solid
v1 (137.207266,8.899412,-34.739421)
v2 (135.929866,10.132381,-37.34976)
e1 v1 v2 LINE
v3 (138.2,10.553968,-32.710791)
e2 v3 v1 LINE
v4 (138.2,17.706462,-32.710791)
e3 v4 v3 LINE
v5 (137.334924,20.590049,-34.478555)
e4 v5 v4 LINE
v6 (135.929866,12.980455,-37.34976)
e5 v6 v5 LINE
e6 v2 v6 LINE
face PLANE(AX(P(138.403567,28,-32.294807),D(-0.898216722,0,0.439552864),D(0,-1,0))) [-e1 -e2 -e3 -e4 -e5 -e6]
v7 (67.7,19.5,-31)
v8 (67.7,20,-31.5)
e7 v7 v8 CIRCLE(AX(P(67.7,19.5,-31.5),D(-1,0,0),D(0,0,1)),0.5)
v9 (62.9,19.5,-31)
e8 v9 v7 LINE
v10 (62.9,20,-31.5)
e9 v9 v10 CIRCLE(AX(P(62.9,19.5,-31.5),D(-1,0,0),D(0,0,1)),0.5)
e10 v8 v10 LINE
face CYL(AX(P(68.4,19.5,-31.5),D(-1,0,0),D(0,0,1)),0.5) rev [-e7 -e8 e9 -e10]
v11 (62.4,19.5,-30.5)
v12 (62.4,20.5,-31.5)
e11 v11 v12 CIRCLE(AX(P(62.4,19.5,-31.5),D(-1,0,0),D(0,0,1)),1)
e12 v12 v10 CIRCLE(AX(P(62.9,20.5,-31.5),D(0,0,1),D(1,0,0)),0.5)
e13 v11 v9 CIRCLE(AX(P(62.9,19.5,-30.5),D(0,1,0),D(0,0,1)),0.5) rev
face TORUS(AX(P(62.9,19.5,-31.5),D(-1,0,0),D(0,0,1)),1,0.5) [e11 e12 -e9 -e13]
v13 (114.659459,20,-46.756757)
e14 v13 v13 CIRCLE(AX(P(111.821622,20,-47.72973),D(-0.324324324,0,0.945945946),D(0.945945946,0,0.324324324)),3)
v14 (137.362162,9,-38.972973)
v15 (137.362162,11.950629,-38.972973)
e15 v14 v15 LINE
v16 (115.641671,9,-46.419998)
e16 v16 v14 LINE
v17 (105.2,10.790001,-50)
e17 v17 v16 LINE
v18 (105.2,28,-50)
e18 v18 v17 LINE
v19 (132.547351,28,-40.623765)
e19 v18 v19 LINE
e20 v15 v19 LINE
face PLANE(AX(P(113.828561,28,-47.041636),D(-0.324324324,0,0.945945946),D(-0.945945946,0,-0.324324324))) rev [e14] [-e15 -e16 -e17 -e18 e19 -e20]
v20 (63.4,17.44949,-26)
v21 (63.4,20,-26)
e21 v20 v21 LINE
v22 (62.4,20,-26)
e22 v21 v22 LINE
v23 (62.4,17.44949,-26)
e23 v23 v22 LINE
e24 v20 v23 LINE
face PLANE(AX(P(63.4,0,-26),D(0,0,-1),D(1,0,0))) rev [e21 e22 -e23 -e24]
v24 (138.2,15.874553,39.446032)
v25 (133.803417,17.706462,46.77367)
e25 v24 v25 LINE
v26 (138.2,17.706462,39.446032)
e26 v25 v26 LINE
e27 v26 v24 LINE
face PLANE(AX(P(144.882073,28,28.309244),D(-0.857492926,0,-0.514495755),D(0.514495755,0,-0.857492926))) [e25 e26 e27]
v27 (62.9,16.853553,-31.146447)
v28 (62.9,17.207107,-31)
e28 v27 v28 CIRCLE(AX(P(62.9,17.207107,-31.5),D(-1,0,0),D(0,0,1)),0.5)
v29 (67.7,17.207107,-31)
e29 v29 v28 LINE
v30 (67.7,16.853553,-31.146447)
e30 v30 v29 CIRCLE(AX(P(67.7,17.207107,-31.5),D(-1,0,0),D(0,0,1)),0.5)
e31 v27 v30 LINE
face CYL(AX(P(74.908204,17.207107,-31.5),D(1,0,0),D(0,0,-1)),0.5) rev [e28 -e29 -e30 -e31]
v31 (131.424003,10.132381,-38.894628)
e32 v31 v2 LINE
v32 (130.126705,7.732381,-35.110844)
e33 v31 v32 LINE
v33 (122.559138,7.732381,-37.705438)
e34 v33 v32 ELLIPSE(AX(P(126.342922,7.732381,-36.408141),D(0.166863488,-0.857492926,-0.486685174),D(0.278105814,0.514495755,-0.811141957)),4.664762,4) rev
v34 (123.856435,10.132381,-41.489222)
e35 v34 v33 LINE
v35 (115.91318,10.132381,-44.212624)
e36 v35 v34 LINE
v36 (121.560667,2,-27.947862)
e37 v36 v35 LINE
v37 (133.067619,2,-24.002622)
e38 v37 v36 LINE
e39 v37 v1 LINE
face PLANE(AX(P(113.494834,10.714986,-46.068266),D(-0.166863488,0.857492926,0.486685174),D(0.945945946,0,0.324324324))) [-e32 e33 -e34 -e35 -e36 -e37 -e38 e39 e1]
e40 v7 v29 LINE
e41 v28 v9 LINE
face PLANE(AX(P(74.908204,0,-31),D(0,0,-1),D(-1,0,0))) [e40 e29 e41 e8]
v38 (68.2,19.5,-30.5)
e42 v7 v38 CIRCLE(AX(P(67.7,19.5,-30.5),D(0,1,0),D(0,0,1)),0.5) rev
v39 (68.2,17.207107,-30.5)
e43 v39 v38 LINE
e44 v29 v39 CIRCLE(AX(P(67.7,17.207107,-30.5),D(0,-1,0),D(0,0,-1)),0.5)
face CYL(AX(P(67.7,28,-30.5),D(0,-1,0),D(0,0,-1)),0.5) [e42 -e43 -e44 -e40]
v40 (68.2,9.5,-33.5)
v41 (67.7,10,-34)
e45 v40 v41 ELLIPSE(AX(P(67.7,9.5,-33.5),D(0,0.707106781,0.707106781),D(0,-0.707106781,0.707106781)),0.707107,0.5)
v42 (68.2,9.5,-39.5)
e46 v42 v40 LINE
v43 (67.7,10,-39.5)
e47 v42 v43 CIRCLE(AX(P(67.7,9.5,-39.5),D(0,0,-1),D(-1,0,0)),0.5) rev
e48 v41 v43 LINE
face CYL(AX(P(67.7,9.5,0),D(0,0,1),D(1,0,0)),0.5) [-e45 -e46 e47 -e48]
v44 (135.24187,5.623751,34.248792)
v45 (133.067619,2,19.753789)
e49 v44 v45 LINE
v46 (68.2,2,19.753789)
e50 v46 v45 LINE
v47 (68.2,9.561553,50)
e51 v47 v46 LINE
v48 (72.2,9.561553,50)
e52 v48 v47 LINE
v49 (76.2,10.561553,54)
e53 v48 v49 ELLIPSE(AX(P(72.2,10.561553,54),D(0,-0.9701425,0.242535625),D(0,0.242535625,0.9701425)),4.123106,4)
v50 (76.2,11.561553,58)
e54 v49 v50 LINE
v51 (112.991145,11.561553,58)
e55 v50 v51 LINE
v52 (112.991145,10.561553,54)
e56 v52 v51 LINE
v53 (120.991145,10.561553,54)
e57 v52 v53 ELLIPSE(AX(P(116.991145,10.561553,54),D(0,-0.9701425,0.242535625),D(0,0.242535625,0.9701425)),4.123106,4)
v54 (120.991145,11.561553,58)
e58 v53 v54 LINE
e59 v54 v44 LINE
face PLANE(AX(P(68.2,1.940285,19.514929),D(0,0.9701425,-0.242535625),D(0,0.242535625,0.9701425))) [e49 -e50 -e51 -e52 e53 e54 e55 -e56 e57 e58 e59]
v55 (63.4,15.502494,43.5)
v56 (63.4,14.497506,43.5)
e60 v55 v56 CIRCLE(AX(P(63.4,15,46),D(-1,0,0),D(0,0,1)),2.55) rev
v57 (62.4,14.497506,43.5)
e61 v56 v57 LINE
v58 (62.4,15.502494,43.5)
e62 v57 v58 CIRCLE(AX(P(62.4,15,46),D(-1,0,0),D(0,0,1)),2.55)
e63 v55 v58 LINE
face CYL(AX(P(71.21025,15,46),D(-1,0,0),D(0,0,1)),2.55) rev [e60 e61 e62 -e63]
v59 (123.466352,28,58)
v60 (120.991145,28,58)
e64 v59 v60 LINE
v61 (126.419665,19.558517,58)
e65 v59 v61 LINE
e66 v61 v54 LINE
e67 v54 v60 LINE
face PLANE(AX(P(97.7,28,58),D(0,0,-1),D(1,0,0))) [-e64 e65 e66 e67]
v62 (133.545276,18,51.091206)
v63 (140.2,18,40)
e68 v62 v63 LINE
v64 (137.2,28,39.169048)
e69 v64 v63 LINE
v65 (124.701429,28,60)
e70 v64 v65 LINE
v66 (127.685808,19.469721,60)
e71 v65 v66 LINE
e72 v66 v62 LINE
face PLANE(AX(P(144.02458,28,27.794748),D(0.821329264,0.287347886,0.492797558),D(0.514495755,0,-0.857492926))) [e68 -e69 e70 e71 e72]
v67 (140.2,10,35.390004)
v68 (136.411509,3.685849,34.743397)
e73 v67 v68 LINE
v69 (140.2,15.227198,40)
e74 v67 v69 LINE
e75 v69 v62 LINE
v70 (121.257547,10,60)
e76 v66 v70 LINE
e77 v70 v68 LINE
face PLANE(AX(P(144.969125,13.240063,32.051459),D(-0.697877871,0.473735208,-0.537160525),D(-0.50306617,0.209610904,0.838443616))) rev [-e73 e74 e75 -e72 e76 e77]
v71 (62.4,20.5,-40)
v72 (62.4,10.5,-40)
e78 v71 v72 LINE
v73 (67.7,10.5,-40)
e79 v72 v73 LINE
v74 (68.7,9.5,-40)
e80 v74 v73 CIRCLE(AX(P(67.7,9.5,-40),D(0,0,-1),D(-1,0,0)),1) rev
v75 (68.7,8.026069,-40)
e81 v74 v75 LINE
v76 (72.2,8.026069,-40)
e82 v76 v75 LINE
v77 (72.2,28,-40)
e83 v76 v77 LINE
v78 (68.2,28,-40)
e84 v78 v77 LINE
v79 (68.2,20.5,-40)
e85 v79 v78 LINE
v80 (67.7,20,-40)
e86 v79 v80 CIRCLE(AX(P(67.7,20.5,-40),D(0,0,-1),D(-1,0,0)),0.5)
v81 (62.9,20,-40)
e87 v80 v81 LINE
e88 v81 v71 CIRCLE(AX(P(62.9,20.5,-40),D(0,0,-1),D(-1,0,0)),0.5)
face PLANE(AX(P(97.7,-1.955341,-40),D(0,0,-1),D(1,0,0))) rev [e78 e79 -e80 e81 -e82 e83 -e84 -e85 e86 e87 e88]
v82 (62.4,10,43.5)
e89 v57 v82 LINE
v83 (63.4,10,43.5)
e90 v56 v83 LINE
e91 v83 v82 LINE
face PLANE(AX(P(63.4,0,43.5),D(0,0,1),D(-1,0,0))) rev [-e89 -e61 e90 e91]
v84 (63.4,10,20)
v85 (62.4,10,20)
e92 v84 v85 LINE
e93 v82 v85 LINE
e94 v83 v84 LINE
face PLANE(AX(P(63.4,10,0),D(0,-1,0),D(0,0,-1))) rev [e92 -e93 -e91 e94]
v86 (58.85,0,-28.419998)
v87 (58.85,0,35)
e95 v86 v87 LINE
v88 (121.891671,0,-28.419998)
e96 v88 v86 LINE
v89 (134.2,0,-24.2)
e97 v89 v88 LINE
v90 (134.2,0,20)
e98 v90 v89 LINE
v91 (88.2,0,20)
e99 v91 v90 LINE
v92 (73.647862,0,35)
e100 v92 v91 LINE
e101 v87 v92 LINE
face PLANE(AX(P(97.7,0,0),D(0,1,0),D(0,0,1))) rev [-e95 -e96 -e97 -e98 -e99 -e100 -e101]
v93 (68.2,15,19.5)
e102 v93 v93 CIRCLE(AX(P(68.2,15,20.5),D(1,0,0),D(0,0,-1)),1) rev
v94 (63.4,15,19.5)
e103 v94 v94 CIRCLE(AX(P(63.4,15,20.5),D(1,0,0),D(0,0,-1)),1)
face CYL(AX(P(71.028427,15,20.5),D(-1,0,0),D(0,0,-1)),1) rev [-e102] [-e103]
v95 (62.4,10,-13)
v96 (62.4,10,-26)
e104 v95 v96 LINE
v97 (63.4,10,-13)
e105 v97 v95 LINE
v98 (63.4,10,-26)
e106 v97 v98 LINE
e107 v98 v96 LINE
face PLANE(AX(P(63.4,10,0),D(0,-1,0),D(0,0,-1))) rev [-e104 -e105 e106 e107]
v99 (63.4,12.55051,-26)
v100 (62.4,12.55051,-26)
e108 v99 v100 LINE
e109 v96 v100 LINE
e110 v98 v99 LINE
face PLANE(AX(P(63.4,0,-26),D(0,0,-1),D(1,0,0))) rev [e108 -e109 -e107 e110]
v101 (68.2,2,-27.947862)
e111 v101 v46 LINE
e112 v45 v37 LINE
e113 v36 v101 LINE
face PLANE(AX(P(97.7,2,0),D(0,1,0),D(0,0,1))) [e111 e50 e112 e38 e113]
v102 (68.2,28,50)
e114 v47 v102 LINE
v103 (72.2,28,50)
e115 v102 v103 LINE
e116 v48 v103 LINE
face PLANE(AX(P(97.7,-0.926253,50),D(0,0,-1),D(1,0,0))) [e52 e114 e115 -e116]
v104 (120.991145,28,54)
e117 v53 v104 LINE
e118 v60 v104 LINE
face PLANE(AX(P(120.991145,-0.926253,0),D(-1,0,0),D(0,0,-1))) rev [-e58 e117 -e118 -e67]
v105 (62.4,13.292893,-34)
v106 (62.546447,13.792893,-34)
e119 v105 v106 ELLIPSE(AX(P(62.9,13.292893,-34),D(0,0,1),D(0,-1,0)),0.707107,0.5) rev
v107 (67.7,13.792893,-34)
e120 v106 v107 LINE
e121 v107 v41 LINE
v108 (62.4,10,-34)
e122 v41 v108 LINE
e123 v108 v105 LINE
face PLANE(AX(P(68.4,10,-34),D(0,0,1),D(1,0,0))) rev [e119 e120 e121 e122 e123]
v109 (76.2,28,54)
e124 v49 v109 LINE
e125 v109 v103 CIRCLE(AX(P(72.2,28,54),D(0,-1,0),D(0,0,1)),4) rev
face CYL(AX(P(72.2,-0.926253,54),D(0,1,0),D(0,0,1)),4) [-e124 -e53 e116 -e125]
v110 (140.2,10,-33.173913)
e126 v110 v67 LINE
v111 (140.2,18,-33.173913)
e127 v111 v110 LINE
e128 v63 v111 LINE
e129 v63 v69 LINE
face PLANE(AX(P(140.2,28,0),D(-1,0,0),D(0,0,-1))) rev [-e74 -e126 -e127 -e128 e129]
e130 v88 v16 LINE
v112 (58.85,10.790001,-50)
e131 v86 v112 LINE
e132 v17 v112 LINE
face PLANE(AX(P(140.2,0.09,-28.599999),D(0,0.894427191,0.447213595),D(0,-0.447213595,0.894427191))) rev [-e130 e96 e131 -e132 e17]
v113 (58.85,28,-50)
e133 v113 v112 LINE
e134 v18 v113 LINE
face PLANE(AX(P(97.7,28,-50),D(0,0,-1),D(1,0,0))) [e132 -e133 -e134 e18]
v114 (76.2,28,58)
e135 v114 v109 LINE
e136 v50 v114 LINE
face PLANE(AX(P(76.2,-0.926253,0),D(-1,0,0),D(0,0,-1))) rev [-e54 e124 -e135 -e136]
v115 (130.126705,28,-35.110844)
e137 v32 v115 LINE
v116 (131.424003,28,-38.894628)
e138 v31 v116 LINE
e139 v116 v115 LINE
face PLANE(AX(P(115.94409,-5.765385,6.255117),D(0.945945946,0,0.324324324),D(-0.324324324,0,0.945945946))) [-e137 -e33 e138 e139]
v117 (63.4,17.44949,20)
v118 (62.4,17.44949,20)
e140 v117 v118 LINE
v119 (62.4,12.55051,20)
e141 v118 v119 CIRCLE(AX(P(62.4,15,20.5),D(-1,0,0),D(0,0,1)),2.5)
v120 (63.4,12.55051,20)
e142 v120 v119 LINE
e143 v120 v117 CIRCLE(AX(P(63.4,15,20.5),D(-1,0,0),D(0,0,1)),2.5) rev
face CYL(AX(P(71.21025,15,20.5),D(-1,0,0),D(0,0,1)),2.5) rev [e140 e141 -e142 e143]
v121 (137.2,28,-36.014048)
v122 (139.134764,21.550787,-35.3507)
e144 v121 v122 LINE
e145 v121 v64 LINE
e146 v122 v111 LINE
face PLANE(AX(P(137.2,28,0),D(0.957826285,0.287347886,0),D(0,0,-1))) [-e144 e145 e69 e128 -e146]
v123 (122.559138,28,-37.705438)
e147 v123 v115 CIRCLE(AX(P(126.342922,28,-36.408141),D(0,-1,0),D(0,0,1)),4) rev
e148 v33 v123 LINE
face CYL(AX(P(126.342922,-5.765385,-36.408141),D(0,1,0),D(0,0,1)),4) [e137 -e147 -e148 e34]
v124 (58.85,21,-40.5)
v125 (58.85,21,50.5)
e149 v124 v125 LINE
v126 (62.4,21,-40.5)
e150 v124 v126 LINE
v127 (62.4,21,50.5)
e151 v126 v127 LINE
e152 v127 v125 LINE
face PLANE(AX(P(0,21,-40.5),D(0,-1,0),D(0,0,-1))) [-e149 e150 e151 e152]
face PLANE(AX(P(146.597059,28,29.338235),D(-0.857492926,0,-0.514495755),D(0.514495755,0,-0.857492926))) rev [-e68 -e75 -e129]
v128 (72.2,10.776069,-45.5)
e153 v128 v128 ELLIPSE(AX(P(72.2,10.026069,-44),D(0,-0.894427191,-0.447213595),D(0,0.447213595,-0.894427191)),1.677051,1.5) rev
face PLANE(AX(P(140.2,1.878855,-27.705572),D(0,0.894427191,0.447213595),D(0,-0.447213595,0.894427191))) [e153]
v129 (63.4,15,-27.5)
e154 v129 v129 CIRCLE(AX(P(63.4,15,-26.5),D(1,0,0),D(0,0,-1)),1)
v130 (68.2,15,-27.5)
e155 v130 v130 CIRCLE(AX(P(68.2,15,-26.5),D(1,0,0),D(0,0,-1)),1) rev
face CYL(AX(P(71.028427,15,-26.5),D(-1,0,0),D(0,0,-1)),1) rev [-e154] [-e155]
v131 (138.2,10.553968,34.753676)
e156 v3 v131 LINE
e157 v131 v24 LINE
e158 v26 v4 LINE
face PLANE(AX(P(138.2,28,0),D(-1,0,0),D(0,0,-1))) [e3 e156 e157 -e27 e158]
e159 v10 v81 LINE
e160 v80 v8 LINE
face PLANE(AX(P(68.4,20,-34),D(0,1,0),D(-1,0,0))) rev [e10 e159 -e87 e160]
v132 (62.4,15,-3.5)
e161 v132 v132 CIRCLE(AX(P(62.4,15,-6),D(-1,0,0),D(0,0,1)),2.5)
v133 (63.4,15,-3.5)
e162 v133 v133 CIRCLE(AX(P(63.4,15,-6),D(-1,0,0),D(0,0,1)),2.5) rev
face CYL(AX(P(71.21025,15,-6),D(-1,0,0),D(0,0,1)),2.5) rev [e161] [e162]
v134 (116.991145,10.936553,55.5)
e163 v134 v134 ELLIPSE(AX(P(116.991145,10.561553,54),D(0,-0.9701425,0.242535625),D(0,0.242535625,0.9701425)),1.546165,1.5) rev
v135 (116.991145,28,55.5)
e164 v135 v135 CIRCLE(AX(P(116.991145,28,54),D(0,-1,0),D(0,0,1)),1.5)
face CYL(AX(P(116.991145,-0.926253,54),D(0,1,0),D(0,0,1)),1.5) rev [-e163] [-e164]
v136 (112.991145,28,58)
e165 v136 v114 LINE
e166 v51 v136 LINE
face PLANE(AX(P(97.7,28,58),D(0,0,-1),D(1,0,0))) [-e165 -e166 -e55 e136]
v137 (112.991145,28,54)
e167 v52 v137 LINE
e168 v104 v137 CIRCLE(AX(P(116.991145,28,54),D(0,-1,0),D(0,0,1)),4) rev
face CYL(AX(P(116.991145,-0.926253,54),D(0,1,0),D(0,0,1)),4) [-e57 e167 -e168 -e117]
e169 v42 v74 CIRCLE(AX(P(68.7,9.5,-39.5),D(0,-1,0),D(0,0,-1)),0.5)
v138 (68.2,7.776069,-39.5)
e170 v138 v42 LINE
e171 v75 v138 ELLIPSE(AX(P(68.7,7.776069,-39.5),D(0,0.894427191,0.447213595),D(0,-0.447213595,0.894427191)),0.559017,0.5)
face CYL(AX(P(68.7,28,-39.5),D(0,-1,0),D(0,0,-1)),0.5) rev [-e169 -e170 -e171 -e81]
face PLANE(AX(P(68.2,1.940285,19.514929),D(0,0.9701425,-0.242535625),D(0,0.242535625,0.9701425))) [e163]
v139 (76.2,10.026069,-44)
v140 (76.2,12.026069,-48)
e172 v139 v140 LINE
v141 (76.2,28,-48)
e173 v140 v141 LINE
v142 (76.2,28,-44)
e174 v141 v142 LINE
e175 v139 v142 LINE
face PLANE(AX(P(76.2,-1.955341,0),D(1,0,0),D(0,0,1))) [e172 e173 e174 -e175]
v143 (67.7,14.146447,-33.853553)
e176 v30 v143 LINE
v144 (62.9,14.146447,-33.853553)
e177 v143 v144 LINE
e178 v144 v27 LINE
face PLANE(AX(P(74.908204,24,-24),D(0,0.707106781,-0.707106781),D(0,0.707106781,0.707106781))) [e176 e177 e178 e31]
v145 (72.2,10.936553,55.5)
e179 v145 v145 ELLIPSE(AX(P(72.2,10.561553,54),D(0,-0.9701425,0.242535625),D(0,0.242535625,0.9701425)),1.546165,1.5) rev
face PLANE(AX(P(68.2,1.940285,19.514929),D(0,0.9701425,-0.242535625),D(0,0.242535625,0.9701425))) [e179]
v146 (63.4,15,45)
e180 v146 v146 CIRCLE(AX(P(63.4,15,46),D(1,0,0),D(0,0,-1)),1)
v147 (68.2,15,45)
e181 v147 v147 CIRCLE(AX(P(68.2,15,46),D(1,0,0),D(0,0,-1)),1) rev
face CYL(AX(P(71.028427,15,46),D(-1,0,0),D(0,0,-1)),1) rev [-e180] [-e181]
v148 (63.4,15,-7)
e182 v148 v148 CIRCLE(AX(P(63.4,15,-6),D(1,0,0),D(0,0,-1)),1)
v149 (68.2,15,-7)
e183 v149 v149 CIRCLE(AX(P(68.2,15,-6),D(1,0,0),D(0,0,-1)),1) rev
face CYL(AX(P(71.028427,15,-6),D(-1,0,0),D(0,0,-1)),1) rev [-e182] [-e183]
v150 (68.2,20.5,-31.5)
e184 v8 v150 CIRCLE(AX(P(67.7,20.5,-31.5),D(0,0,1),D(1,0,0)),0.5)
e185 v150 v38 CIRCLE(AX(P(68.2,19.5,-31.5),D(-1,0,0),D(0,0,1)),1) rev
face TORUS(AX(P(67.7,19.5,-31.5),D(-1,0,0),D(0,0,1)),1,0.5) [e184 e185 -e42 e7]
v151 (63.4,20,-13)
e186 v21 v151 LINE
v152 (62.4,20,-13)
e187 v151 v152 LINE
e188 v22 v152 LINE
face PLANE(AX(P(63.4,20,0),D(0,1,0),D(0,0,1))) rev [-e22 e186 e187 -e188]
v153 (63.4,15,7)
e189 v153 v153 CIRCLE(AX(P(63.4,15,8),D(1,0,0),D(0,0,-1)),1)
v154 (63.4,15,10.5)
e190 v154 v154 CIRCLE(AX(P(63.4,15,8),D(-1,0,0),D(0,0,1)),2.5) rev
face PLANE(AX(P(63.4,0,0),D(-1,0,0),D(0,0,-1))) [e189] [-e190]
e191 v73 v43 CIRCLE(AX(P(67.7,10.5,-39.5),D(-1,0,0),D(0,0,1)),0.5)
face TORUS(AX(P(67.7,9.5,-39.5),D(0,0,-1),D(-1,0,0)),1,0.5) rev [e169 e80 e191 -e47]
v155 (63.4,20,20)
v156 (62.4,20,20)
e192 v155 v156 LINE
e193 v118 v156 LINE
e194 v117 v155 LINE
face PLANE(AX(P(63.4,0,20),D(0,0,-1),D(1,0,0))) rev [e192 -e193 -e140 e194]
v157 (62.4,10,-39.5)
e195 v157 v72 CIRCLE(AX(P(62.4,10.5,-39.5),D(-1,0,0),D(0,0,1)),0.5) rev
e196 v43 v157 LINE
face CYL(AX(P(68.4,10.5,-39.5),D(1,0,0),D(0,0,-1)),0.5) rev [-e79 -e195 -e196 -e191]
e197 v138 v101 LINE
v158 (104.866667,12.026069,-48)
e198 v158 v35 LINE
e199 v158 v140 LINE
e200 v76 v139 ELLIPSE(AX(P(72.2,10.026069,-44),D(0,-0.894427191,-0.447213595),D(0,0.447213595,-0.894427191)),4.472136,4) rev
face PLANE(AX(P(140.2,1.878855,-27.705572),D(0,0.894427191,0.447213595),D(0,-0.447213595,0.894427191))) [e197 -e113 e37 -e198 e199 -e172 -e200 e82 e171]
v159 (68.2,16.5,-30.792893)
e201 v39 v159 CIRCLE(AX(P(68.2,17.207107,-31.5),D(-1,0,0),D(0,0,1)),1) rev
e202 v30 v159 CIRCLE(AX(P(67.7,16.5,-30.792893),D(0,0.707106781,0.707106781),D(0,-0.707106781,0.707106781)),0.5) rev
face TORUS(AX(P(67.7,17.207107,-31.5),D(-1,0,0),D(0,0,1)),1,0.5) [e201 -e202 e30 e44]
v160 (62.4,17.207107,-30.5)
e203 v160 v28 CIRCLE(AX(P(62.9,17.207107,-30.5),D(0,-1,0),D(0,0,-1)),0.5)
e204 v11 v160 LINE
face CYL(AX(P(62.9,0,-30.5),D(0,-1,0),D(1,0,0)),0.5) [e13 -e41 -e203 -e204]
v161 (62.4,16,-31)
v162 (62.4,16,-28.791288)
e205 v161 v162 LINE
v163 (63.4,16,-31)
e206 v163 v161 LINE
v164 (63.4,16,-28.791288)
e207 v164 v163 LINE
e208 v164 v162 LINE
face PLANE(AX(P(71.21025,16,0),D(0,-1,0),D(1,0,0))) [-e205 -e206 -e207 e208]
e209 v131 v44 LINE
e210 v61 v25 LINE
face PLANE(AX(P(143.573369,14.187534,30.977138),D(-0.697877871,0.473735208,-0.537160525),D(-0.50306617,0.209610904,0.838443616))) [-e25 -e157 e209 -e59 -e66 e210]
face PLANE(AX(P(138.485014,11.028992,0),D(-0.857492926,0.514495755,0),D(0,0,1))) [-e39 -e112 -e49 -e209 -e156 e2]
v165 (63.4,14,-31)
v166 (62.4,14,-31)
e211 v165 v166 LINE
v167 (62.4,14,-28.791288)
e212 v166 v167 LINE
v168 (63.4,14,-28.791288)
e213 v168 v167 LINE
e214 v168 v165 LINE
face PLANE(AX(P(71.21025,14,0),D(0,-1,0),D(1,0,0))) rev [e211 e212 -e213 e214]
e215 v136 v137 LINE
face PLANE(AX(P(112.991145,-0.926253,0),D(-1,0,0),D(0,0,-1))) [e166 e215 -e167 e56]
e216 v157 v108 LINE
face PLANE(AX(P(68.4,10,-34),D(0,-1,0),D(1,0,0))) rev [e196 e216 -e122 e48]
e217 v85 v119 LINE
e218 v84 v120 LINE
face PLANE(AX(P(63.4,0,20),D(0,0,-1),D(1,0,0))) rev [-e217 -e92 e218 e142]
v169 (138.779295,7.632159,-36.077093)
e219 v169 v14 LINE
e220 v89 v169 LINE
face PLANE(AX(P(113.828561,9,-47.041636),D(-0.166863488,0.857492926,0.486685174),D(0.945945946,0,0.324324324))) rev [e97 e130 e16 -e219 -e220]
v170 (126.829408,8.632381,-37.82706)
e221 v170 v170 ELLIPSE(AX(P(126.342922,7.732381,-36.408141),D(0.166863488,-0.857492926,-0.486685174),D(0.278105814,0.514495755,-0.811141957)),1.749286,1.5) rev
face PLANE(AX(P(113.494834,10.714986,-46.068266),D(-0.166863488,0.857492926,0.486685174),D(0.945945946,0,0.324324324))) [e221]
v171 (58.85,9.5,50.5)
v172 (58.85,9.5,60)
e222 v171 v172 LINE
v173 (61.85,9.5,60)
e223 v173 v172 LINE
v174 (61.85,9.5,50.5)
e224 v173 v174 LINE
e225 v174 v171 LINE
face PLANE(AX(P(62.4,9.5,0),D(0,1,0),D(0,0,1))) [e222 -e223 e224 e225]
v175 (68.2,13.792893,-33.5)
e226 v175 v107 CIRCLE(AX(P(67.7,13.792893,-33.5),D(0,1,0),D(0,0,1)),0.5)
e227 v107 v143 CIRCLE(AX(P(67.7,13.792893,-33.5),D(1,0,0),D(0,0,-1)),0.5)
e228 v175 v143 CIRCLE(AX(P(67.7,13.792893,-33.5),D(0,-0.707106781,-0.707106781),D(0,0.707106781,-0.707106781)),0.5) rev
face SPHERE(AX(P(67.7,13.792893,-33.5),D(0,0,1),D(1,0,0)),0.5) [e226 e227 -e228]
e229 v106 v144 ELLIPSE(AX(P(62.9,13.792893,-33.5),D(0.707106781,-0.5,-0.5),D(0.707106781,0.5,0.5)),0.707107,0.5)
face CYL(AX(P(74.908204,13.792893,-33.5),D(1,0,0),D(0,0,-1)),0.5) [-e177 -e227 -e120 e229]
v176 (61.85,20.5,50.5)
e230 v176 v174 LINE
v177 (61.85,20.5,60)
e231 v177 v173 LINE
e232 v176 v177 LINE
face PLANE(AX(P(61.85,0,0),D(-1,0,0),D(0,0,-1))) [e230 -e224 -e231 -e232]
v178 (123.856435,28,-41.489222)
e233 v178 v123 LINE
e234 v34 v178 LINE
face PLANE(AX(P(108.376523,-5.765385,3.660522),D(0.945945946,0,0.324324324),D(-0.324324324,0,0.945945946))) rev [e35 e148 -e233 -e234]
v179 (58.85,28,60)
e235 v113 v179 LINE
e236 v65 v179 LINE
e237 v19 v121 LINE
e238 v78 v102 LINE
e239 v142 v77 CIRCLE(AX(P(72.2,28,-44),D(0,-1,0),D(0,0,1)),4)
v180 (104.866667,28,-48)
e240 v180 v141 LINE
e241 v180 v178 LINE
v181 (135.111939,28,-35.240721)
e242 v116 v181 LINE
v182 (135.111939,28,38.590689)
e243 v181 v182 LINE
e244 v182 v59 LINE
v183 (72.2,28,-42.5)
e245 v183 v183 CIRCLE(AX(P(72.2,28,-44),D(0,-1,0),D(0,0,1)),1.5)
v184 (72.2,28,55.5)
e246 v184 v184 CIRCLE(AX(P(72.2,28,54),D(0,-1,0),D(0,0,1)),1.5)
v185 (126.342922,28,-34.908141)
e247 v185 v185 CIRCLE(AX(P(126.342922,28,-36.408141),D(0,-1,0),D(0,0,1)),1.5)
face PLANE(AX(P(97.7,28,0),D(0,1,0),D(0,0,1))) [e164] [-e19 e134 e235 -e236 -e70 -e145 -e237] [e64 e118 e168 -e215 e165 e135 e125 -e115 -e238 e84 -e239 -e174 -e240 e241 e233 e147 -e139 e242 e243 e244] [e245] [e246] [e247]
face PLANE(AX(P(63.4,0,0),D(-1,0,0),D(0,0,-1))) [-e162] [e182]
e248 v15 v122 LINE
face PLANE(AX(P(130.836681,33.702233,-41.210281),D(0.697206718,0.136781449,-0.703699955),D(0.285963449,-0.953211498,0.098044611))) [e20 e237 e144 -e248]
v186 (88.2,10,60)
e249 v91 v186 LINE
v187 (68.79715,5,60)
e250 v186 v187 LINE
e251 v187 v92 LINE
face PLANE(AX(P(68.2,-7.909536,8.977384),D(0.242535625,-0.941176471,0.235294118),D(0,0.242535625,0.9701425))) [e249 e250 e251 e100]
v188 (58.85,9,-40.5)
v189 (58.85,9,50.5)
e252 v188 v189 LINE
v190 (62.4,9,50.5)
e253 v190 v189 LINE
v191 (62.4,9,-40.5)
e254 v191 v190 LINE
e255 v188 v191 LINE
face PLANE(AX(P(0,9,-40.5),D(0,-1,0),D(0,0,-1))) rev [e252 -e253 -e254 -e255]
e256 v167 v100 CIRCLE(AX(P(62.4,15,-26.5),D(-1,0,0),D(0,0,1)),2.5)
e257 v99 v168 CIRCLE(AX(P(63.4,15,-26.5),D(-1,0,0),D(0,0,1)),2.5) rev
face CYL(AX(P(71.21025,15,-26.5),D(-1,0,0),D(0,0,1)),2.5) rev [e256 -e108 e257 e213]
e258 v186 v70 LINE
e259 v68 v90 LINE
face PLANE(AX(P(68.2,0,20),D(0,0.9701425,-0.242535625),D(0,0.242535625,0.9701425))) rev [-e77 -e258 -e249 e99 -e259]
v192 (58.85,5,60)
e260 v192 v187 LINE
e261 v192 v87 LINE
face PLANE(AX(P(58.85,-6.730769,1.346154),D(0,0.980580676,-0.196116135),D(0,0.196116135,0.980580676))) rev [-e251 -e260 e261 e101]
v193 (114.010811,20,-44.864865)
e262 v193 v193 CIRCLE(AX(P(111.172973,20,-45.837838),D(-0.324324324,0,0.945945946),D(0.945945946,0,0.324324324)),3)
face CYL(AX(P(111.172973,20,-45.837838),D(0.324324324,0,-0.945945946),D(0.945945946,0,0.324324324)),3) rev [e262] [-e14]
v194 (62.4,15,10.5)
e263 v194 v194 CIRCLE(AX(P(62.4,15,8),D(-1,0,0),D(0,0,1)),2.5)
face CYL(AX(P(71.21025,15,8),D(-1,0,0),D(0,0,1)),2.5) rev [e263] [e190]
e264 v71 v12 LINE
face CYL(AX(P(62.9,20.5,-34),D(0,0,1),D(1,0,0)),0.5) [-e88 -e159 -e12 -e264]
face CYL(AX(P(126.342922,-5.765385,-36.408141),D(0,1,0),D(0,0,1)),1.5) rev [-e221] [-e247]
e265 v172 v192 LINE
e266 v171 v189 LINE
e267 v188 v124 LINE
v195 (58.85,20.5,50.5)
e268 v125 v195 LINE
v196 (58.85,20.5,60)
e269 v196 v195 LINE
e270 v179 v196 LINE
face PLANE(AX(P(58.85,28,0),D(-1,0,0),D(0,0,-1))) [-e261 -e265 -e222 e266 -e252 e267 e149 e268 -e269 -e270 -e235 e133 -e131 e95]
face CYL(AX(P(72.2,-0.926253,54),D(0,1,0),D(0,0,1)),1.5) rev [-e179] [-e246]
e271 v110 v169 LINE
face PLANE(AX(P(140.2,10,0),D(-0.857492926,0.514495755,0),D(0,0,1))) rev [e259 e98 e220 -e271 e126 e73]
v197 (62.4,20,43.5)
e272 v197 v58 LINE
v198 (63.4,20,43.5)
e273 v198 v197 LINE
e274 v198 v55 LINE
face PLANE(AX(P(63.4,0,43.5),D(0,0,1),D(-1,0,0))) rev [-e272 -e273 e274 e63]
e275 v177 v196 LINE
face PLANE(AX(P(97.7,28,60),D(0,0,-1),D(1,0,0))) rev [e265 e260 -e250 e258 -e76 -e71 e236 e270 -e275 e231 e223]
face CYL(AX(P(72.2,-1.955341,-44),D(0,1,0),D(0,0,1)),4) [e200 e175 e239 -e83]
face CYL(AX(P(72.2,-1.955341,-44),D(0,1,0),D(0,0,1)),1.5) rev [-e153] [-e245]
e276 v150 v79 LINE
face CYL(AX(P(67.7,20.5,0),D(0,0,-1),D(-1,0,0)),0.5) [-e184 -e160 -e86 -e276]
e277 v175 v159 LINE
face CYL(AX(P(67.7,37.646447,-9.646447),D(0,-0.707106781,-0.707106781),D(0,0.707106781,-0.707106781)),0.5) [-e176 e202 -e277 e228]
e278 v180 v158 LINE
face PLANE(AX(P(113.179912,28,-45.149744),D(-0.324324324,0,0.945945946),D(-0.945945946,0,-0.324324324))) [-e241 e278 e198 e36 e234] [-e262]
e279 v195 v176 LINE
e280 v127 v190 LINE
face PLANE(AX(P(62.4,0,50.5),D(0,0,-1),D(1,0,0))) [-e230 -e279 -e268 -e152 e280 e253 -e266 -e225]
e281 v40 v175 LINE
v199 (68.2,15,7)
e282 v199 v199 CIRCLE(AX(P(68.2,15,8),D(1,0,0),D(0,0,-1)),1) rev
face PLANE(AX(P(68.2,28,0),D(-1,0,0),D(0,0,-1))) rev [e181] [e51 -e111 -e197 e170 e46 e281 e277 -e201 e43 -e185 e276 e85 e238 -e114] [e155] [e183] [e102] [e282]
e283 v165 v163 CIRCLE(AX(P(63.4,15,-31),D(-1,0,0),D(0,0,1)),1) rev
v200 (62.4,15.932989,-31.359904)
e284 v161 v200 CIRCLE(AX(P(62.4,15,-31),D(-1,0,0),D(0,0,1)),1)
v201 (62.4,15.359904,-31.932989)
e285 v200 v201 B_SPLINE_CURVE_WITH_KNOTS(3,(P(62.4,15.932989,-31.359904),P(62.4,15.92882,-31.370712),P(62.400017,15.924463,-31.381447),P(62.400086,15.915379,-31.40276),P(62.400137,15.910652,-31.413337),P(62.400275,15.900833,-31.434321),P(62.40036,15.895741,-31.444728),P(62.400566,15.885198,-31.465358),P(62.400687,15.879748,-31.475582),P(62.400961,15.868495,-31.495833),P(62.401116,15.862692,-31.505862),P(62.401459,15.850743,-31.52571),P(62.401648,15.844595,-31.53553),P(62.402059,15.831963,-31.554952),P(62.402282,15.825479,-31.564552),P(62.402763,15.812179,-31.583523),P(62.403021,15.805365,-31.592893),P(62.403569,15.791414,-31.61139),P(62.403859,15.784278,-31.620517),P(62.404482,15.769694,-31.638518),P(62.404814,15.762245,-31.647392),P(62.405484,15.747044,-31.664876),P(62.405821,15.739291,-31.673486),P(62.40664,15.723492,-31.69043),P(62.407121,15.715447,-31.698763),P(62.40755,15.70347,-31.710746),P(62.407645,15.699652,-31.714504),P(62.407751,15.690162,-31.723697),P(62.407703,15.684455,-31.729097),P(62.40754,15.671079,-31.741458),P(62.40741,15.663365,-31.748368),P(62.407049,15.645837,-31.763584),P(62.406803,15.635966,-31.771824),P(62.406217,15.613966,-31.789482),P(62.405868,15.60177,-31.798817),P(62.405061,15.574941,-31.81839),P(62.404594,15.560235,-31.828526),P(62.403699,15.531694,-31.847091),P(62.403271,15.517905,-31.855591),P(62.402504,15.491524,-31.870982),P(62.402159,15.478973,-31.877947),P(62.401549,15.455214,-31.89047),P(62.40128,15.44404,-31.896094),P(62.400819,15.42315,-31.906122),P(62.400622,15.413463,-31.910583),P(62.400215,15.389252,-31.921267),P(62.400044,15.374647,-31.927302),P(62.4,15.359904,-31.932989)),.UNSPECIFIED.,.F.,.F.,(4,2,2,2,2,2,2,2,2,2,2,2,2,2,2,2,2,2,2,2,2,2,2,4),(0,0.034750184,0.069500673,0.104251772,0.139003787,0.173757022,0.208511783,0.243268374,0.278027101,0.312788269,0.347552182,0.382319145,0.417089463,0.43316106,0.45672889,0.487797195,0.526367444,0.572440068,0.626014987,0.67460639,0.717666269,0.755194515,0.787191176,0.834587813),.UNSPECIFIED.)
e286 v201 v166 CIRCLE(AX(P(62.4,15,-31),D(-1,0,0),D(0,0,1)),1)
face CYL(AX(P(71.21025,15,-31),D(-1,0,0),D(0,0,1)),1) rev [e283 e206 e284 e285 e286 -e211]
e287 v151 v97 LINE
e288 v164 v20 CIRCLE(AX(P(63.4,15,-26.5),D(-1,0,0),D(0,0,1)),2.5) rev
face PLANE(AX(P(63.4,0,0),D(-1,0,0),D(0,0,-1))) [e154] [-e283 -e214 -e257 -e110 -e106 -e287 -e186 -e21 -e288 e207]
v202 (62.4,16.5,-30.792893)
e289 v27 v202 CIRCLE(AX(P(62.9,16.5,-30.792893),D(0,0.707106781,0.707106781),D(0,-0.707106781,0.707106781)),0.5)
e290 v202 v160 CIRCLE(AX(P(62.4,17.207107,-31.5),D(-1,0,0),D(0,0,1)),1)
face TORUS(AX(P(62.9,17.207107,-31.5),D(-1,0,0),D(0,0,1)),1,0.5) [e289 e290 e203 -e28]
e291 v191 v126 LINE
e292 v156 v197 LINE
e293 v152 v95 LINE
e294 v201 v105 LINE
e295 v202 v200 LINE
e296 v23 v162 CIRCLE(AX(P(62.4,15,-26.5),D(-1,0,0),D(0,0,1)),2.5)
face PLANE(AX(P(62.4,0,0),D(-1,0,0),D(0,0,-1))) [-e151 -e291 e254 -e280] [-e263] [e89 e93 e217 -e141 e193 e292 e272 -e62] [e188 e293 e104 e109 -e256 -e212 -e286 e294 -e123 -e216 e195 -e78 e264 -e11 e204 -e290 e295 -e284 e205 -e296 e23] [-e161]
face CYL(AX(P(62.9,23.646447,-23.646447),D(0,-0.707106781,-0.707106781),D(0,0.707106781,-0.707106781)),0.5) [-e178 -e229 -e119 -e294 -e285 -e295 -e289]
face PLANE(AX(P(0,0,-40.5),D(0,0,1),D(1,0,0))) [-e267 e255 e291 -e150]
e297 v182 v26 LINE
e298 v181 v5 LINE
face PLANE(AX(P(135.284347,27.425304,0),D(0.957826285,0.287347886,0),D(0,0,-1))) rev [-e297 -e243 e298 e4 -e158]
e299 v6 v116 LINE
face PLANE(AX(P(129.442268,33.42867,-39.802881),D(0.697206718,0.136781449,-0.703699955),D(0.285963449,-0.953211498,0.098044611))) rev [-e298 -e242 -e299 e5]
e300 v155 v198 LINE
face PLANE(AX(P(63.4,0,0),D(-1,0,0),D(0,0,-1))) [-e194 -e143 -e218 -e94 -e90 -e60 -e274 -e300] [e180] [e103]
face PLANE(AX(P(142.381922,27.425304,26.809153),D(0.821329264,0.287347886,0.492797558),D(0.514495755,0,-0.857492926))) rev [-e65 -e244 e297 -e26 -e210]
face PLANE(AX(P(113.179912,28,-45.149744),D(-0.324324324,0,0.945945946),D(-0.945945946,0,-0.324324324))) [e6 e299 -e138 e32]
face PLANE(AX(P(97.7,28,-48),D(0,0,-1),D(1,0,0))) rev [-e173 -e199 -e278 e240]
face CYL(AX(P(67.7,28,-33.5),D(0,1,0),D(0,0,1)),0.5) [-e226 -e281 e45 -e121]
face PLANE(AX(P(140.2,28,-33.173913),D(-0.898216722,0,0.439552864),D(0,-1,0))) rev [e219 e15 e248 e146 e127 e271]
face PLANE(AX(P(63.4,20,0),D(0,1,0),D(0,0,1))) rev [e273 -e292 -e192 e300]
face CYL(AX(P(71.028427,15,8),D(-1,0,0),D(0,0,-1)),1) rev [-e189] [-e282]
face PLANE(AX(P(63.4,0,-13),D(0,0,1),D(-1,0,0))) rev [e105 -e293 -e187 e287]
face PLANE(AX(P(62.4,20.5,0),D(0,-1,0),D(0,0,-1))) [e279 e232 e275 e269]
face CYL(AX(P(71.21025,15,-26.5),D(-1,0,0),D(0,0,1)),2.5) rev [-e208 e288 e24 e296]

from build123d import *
from OCP.BRepFilletAPI import BRepFilletAPI_MakeChamfer

# Parameters (mm, degrees)
SKETCH1_W                 = 55
SKETCH1_H                 = 60
BOSS_EXTRUDE1_DEPTH       = 28
CHAMFER5_SIZE             = 15
CHAMFER5_SIZE2            = 9
CUT_EXTRUDE3_DEPTH        = 98.816154085
CUT_EXTRUDE5_DEPTH        = 98.816154085
CHAMFER2_SIZE             = 6
CHAMFER2_SIZE2            = 10
CHAMFER2_PART_2_SIZE      = 6
CHAMFER2_PART_2_SIZE2     = 10
CHAMFER3_SIZE             = 10
CHAMFER3_SIZE2            = 3
CHAMFER8_SIZE             = 3
CHAMFER8_SIZE2            = 4.688384964
CHAMFER8_SIZE2_2          = 4.826086957
SHELL1_T                  = -2
SKETCH1_3_W               = 9.35
SKETCH1_3_H               = 100
SKETCH1_3_H_2             = 10
BOSS_EXTRUDE2_DEPTH       = 28
CUT_EXTRUDE4_DEPTH        = 9.35
CUT_EXTRUDE6_DEPTH        = 98.816154085
CHAMFER6_SIZE             = 20
CHAMFER6_SIZE_2           = 5
SKETCH10_R                = 3
CUT_EXTRUDE7_DEPTH        = 2
BOSS_EXTRUDE3_REACH       = 80.678
SKETCH12_R                = 1.5
BOSS_EXTRUDE4_REACH       = 80.678
SKETCH12_4_R              = 1.5
BOSS_EXTRUDE5_REACH       = 80.678
SKETCH12_5_R              = 1.5
CUT_EXTRUDE8_DEPTH        = 3.55
SKETCH15_R                = 1
SKETCH15_R_2              = 2
CUT_EXTRUDE9_DEPTH        = 1
SKETCH15_3_R              = 1
CUT_EXTRUDE10_DEPTH       = 5.8
CUT_EXTRUDE11_DEPTH       = 3
SKETCH16_W                = 6
SKETCH16_H                = 10
CUT_EXTRUDE12_DEPTH       = 6
CUT_EXTRUDE13_DEPTH       = 90.5
CUT_EXTRUDE13_DEPTH_BACK  = 0.5
SKETCH17_W                = 3.55
SKETCH17_H                = 0.5
CUT_EXTRUDE14_DEPTH       = 5.8
FILLET1_R                 = 0.5
CUT_EXTRUDE15_START       = -1
CUT_EXTRUDE15_OUTLINE_R   = 2.5
CUT_EXTRUDE15_OUTLINE_R_2 = 2
CUT_EXTRUDE15_DEPTH       = 1


# Read off the part's stored shape, not the designer's step: Cut-Extrude15
with BuildPart() as part:
    # Sketch1 → Boss-Extrude1 (new body)
    # profile 1 of 2: a face of its own
    with BuildSketch(Plane(origin=(0, 0, 0), x_dir=(1, 0, 0), z_dir=(0, 1, 0))):
        Polygon((29.5, 50), (-7.5, 50), (-42.5, 38), (-42.5, -40), (-30.5, -60), (29.5, -60), (29.5, -50), align=None)
        Rectangle(SKETCH1_W, SKETCH1_H, mode=Mode.SUBTRACT)
    # profile 2 of 2: a face of its own
    with BuildSketch(Plane(origin=(0, 0, 0), x_dir=(1, 0, 0), z_dir=(0, 1, 0))):
        Rectangle(SKETCH1_W, SKETCH1_H)
    extrude(amount=BOSS_EXTRUDE1_DEPTH)

    # Chamfer5
    chamfer5_edges = [part.edges().sort_by_distance(p)[0] for p in [
        (-25, 0, -44),
    ]]
    chamfer5_side = [part.faces().sort_by_distance(p)[0] for p in [
        (-5.320816864, 0, 5.646903821),
    ]]
    chamfer(chamfer5_edges, length=CHAMFER5_SIZE, length2=CHAMFER5_SIZE2, reference=chamfer5_side[0])

    # Sketch6 → Cut-Extrude3 (cut, through all)
    with BuildSketch(Plane(origin=(29.5, 0, 0), x_dir=(0, 0, -1), z_dir=(1, 0, 0))):
        Polygon((28.599998808, 0.090000199), (38.599998808, 5.090000199), (50, 10.790000795), (50, 0), (28.41999841, 0), align=None)
    extrude(amount=-CUT_EXTRUDE3_DEPTH, mode=Mode.SUBTRACT)

    # Sketch8 → Cut-Extrude5 (cut, through all)
    with BuildSketch(Plane.ZY.offset(42.5)):
        Polygon((20, 0), (60, 10), (60, 0), align=None)
    extrude(amount=-CUT_EXTRUDE5_DEPTH, mode=Mode.SUBTRACT)

    # Chamfer2
    chamfer2_edges = [part.edges().sort_by_distance(p)[0] for p in [
        (-42.5, 0, -1.071428571),
    ]]
    chamfer2_side = [part.faces().sort_by_distance(p)[0] for p in [
        (-5.998960327, 0, -3.839335876),
    ]]
    chamfer(chamfer2_edges, length=CHAMFER2_SIZE, length2=CHAMFER2_SIZE2, reference=chamfer2_side[0])

    # Chamfer2 part 2
    chamfer2_part_2_edges = [part.edges().sort_by_distance(p)[0] for p in [
        (-36.5, 7.5, 50),
    ]]
    chamfer2_part_2_side = [part.faces().sort_by_distance(p)[0] for p in [
        (-5.108695652, 4.855072464, 39.420289855),
    ]]
    chamfer(chamfer2_part_2_edges, length=CHAMFER2_PART_2_SIZE, length2=CHAMFER2_PART_2_SIZE2, reference=chamfer2_part_2_side[0])

    # Chamfer3: one chamfer whose edges measure the first distance from different faces: ONE call of the kernel's chamfer builder (chamfer() names one face for all edges)
    chamfer3_edges_1 = [part.edges().sort_by_distance(p)[0] for p in [
        (-36.5, 28, 50),
    ]]
    chamfer3_side_1 = [part.faces().sort_by_distance(p)[0] for p in [
        (-36.986722145, 22.762198781, 49.188796426),
    ]]
    chamfer3_edges_2 = [part.edges().sort_by_distance(p)[0] for p in [
        (-42.5, 28, 1),
    ]]
    chamfer3_side_2 = [part.faces().sort_by_distance(p)[0] for p in [
        (-42.5, 19.062821539, 0.675718674),
    ]]
    chamfer3 = BRepFilletAPI_MakeChamfer(part.part.solid().wrapped)
    for e in chamfer3_edges_1:
        chamfer3.Add(CHAMFER3_SIZE, CHAMFER3_SIZE2, e.wrapped, chamfer3_side_1[0].wrapped)  # the first distance lies on this face
    for e in chamfer3_edges_2:
        chamfer3.Add(CHAMFER3_SIZE, CHAMFER3_SIZE2, e.wrapped, chamfer3_side_2[0].wrapped)  # the first distance lies on this face
    add(Compound.cast(chamfer3.Shape()), mode=Mode.REPLACE)

    # Chamfer8: one chamfer whose edges measure the first distance from different faces: ONE call of the kernel's chamfer builder (chamfer() names one face for all edges)
    chamfer8_edges_1 = [part.edges().sort_by_distance(p)[0] for p in [
        (-41, 23, -38.514285714),
    ]]
    chamfer8_side_1 = [part.faces().sort_by_distance(p)[0] for p in [
        (-40.999367405, 23.002108649, 0.534923115),
    ]]
    chamfer8_edges_2 = [part.edges().sort_by_distance(p)[0] for p in [
        (-42.5, 14, -38),
    ]]
    chamfer8_side_2 = [part.faces().sort_by_distance(p)[0] for p in [
        (-24.809989525, 18.489778037, -44.065146449),
    ]]
    chamfer8 = BRepFilletAPI_MakeChamfer(part.part.solid().wrapped)
    for e in chamfer8_edges_1:
        chamfer8.Add(CHAMFER8_SIZE, CHAMFER8_SIZE2, e.wrapped, chamfer8_side_1[0].wrapped)  # the first distance lies on this face
    for e in chamfer8_edges_2:
        chamfer8.Add(CHAMFER8_SIZE, CHAMFER8_SIZE2_2, e.wrapped, chamfer8_side_2[0].wrapped)  # the first distance lies on this face
    add(Compound.cast(chamfer8.Shape()), mode=Mode.REPLACE)

    # Shell1
    shell1_openings = [part.faces().sort_by_distance(p)[0] for p in [
        (-3.850715667, 28, 5.420818652),
        (29.5, 15.210219058, 3.998585691),
    ]]
    offset(amount=SHELL1_T, openings=shell1_openings, kind=Kind.INTERSECTION)

    # Sketch1<3> → Boss-Extrude2 (add)
    with BuildSketch(Plane(origin=(0, 0, 0), x_dir=(1, 0, 0), z_dir=(0, 1, 0))):
        with Locations((34.175, 0)):
            Rectangle(SKETCH1_3_W, SKETCH1_3_H)
        with Locations((34.175, -55)):
            Rectangle(SKETCH1_3_W, SKETCH1_3_H_2)
    extrude(amount=BOSS_EXTRUDE2_DEPTH)

    # Sketch7 → Cut-Extrude4 (cut)
    with BuildSketch(Plane.ZY.offset(-29.5)):
        Polygon((-28.41999841, 0), (-50, 10.790000795), (-50, 0), align=None)
    extrude(amount=-CUT_EXTRUDE4_DEPTH, mode=Mode.SUBTRACT)

    # Sketch9 → Cut-Extrude6 (cut, through all)
    with BuildSketch(Plane.ZY.offset(-29.5)):
        Polygon((60, 0), (60, 5), (35, 0), align=None)
    extrude(amount=-CUT_EXTRUDE6_DEPTH, mode=Mode.SUBTRACT)

    # Chamfer6
    # the kernel refuses this chamfer: 20, 5 mm, written as the material it adds along each edge
    with BuildSketch(Plane(origin=(29.5, -12.597918829, -30.391675317), x_dir=(-0.9999563942249224, 0.009059783074481399, -0.0022649457686203496), z_dir=(0, 0.24253562503633297, 0.9701425001453319))) as chamfer6_piece_1_section:
        Polygon((CHAMFER6_SIZE * 0.999956394225, CHAMFER6_SIZE * 0.00933861064032), (-CHAMFER6_SIZE_2 * 0.00933861064032, CHAMFER6_SIZE_2 * 0.999956394225), (0, 0), align=None)
    chamfer6_piece_1 = extrude(amount=145.116156247, mode=Mode.PRIVATE)
    chamfer6_piece_1 = split(chamfer6_piece_1, bisect_by=Plane(origin=(21.891274925, 0, 42.504406507), z_dir=(0, 1, 0)), keep=Keep.TOP, mode=Mode.PRIVATE)
    chamfer6_piece_1 = split(chamfer6_piece_1, bisect_by=Plane(origin=(21.891274925, 4.42094487, 60), z_dir=(0, 0, -1)), keep=Keep.TOP, mode=Mode.PRIVATE)
    chamfer6_piece_1 = split(chamfer6_piece_1, bisect_by=Plane(origin=(21.891274925, 1.613191439, 43.065957193), z_dir=(0, 0.9805806756909202, -0.19611613513818396)), keep=Keep.TOP, mode=Mode.PRIVATE)
    add(chamfer6_piece_1)

    # Sketch10 → Cut-Extrude7 (cut)
    with BuildSketch(Plane(origin=(-16.128560993, 0, -47.041636231), x_dir=(-0.9459459459459459, 0, 0.3243243243243241), z_dir=(-0.3243243243243242, 0, -0.945945945945946))):
        with Locations((-2.121621622, 20)):
            Circle(SKETCH10_R)
    extrude(amount=-CUT_EXTRUDE7_DEPTH, mode=Mode.SUBTRACT)

    # Boss-Extrude3: up to this plane
    boss_extrude3_end = Plane(origin=(29.5, 1.940285, 19.51492875), z_dir=(0, 0.9701425001453319, -0.24253562503633297))
    # Sketch12 → Boss-Extrude3 (add, up to the surface)
    with BuildSketch(Plane(origin=(0, 28, 0), x_dir=(1, 0, 0), z_dir=(0, 1, 0)), mode=Mode.PRIVATE) as boss_extrude3_sk1:
        with BuildLine():
            Line((21.5, -58), (29.5, -58))
            Line((29.5, -58), (29.5, -50))
            Line((29.5, -50), (25.5, -50))
            ThreePointArc((25.5, -50), (22.671572875, -51.171572875), (21.5, -54))
            Line((21.5, -54), (21.5, -58))
        make_face()
        with Locations(Location((25.5, -54, 0), (0, 0, 270))):
            Circle(SKETCH12_R, mode=Mode.SUBTRACT)
    boss_extrude3_tool1 = split(extrude(boss_extrude3_sk1.sketch, amount=-BOSS_EXTRUDE3_REACH, mode=Mode.PRIVATE), bisect_by=boss_extrude3_end, keep=Keep.BOTH, mode=Mode.PRIVATE)
    add(boss_extrude3_tool1.solids().sort_by_distance((25.5, 28, 57.886863))[0])
    # Sketch12 → Boss-Extrude3 (add, up to the surface)
    with BuildSketch(Plane(origin=(0, 28, 0), x_dir=(1, 0, 0), z_dir=(0, 1, 0)), mode=Mode.PRIVATE) as boss_extrude3_sk2:
        with BuildLine():
            Line((-23.291144984, -58), (-15.291144984, -58))
            Line((-15.291144984, -58), (-15.291144984, -54))
            ThreePointArc((-15.291144984, -54), (-19.291144984, -50), (-23.291144984, -54))
            Line((-23.291144984, -54), (-23.291144984, -58))
        make_face()
        with Locations(Location((-19.291144984, -54, 0), (0, 0, 270))):
            Circle(SKETCH12_R, mode=Mode.SUBTRACT)
    boss_extrude3_tool2 = split(extrude(boss_extrude3_sk2.sketch, amount=-BOSS_EXTRUDE3_REACH, mode=Mode.PRIVATE), bisect_by=boss_extrude3_end, keep=Keep.BOTH, mode=Mode.PRIVATE)
    add(boss_extrude3_tool2.solids().sort_by_distance((-23.178008, 28, 56))[0])

    # Boss-Extrude4: up to this plane
    boss_extrude4_end = Plane(origin=(-42.5, 1.878854581, -27.705571617), z_dir=(0, 0.8944271909999164, 0.44721359549995693))
    # Sketch12<4> → Boss-Extrude4 (add, up to the surface)
    with BuildSketch(Plane(origin=(0, 28, 0), x_dir=(1, 0, 0), z_dir=(0, 1, 0)), mode=Mode.PRIVATE) as boss_extrude4_sk1:
        with BuildLine():
            Line((29.5, 40), (29.5, 48))
            Line((29.5, 48), (21.5, 48))
            Line((21.5, 48), (21.5, 44))
            ThreePointArc((21.5, 44), (22.671572875, 41.171572875), (25.5, 40))
            Line((25.5, 40), (29.5, 40))
        make_face()
        with Locations(Location((25.5, 44, 0), (0, 0, 270))):
            Circle(SKETCH12_4_R, mode=Mode.SUBTRACT)
    boss_extrude4_tool1 = split(extrude(boss_extrude4_sk1.sketch, amount=-BOSS_EXTRUDE4_REACH, mode=Mode.PRIVATE), bisect_by=boss_extrude4_end, keep=Keep.BOTH, mode=Mode.PRIVATE)
    add(boss_extrude4_tool1.solids().sort_by_distance((22.751573, 28, -41.251573))[0])

    # Boss-Extrude5: up to this plane
    boss_extrude5_end = Plane(origin=(-15.794834017, 10.714985851, -46.068265883), z_dir=(0.16686348824676464, 0.8574929257125453, 0.4866851740530639))
    # Sketch12<5> → Boss-Extrude5 (add, up to the surface)
    with BuildSketch(Plane(origin=(0, 28, 0), x_dir=(1, 0, 0), z_dir=(0, 1, 0)), mode=Mode.PRIVATE) as boss_extrude5_sk1:
        with BuildLine():
            Line((-26.156435162, 41.48922223), (-33.72400273, 38.894627636))
            Line((-33.72400273, 38.894627636), (-32.426705432, 35.110843852))
            ThreePointArc((-32.426705432, 35.110843852), (-30.401133137, 32.815274277), (-27.34562442, 32.624357342))
            ThreePointArc((-27.34562442, 32.624357342), (-25.050054776, 34.649929661), (-24.859137865, 37.705438446))
            Line((-24.859137865, 37.705438446), (-26.156435162, 41.48922223))
        make_face()
        with Locations(Location((-28.642921649, 36.408141149, 0), (0, 0, 270))):
            Circle(SKETCH12_5_R, mode=Mode.SUBTRACT)
    boss_extrude5_tool1 = split(extrude(boss_extrude5_sk1.sketch, amount=-BOSS_EXTRUDE5_REACH, mode=Mode.PRIVATE), bisect_by=boss_extrude5_end, keep=Keep.BOTH, mode=Mode.PRIVATE)
    add(boss_extrude5_tool1.solids().sort_by_distance((-25.62927, 28, -39.555679))[0])

    # Sketch14 → Cut-Extrude8 (cut)
    with BuildSketch(Plane(origin=(38.85, 0, 0), x_dir=(0, 0, -1), z_dir=(1, 0, 0))):
        Polygon((-50, 20), (-50, 20.5), (40, 20.5), (40, 20), (40, 10), (40, 9.5), (-50, 9.5), (-50, 10), align=None)
    extrude(amount=-CUT_EXTRUDE8_DEPTH, mode=Mode.SUBTRACT)

    # Sketch15 → Cut-Extrude9 (cut)
    # profile 1 of 5: a face of its own
    with BuildSketch(Plane(origin=(35.3, 0, 0), x_dir=(0, 0, -1), z_dir=(1, 0, 0))):
        with BuildLine():
            Line((13, 10), (26, 10))
            Line((26, 10), (26, 13.063508327))
            ThreePointArc((26, 13.063508327), (28.5, 15), (26, 16.936491673))
            Line((26, 16.936491673), (26, 20))
            Line((26, 20), (13, 20))
            Line((13, 20), (13, 10))
        make_face()
    # profile 2 of 5: a face of its own
    with BuildSketch(Plane(origin=(35.3, 0, 0), x_dir=(0, 0, -1), z_dir=(1, 0, 0))):
        with BuildLine():
            Line((-43.5, 10), (-20, 10))
            Line((-20, 10), (-20, 13.063508327))
            ThreePointArc((-20, 13.063508327), (-18.5, 15), (-20, 16.936491673))
            Line((-20, 16.936491673), (-20, 20))
            Line((-20, 20), (-43.5, 20))
            Line((-43.5, 20), (-43.5, 10))
        make_face()
        with Locations((-20.5, 15)):
            Circle(SKETCH15_R, mode=Mode.SUBTRACT)
    # profile 3 of 5: a face of its own
    with BuildSketch(Plane(origin=(35.3, 0, 0), x_dir=(0, 0, -1), z_dir=(1, 0, 0))):
        with Locations((-46, 15)):
            Circle(SKETCH15_R_2)
        with Locations((-46, 15)):
            Circle(SKETCH15_R, mode=Mode.SUBTRACT)
    # profile 4 of 5: a face of its own
    with BuildSketch(Plane(origin=(35.3, 0, 0), x_dir=(0, 0, -1), z_dir=(1, 0, 0))):
        with Locations((-8, 15)):
            Circle(SKETCH15_R_2)
        with Locations((-8, 15)):
            Circle(SKETCH15_R, mode=Mode.SUBTRACT)
    # profile 5 of 5: a face of its own
    with BuildSketch(Plane(origin=(35.3, 0, 0), x_dir=(0, 0, -1), z_dir=(1, 0, 0))):
        with Locations((6, 15)):
            Circle(SKETCH15_R_2)
        with Locations((6, 15)):
            Circle(SKETCH15_R, mode=Mode.SUBTRACT)
    extrude(amount=-CUT_EXTRUDE9_DEPTH, mode=Mode.SUBTRACT)

    # Sketch15<3> → Cut-Extrude10 (cut)
    with BuildSketch(Plane(origin=(35.3, 0, 0), x_dir=(0, 0, -1), z_dir=(1, 0, 0))):
        with BuildLine():
            ThreePointArc((26, 15.866025404), (25.5, 15), (26, 14.133974596))
            Line((26, 14.133974596), (26, 15.866025404))
        make_face()
        with BuildLine():
            Line((26, 15.866025404), (26, 14.133974596))
            ThreePointArc((26, 14.133974596), (27, 14.133974596), (27.5, 15))
            ThreePointArc((27.5, 15), (27, 15.866025404), (26, 15.866025404))
        make_face()
        with Locations((6, 15)):
            Circle(SKETCH15_3_R)
        with Locations((-8, 15)):
            Circle(SKETCH15_3_R)
        with BuildLine():
            ThreePointArc((-20, 15.866025404), (-21.5, 15), (-20, 14.133974596))
            Line((-20, 14.133974596), (-20, 15.866025404))
        make_face()
        with BuildLine():
            Line((-20, 15.866025404), (-20, 14.133974596))
            ThreePointArc((-20, 14.133974596), (-19.633974596, 14.5), (-19.5, 15))
            ThreePointArc((-19.5, 15), (-19.633974596, 15.5), (-20, 15.866025404))
        make_face()
        with Locations((-46, 15)):
            Circle(SKETCH15_3_R)
    extrude(amount=-CUT_EXTRUDE10_DEPTH, mode=Mode.SUBTRACT)

    # Sketch14<3> → Cut-Extrude11 (cut)
    with BuildSketch(Plane(origin=(38.85, 0, 0), x_dir=(0, 0, -1), z_dir=(1, 0, 0))):
        Polygon((-60, 9.5), (-50, 9.5), (-50, 10), (-50, 20), (-50, 20.5), (-60, 20.5), align=None)
    extrude(amount=-CUT_EXTRUDE11_DEPTH, mode=Mode.SUBTRACT)


with BuildPart() as body_2:
    # Mirror1: mirrored copy
    add(part.part.mirror(Plane(origin=(48.85, 0, 0), x_dir=(0, 0, 1), z_dir=(1, 0, 0))))

    # Sketch16 → Cut-Extrude12 (cut)
    with BuildSketch(Plane.ZY.offset(-62.4)):
        with Locations((-37, 15)):
            Rectangle(SKETCH16_W, SKETCH16_H)
    extrude(amount=-CUT_EXTRUDE12_DEPTH, mode=Mode.SUBTRACT)

    # Sketch17 → Cut-Extrude13 (cut, two sides: drawn at the far end of the back side and taken through both)
    with BuildSketch(Plane.XY.offset(-40).offset(-CUT_EXTRUDE13_DEPTH_BACK)):
        with Locations((60.625, 9.25)):
            Rectangle(SKETCH17_W, SKETCH17_H)
        Polygon((58.85, 20.5), (58.85, 9.5), (62.4, 9.5), (62.4, 10), (62.4, 20), (62.4, 20.5), align=None)
        with Locations((60.625, 20.75)):
            Rectangle(SKETCH17_W, SKETCH17_H)
    extrude(amount=CUT_EXTRUDE13_DEPTH + CUT_EXTRUDE13_DEPTH_BACK, mode=Mode.SUBTRACT)

    # Sketch18 → Cut-Extrude14 (cut)
    with BuildSketch(Plane.ZY.offset(-62.4)):
        Polygon((-31, 20), (-34, 20), (-34, 14), (-31, 17), align=None)
    extrude(amount=-CUT_EXTRUDE14_DEPTH, mode=Mode.SUBTRACT)

    # Fillet1
    fillet1_edges = [body_2.edges().sort_by_distance(p)[0] for p in [
        (68.2, 9.013034386, -40),
        (68.2, 20, -35.5),
        (68.2, 10, -37),
        (68.2, 12, -34),
        (68.2, 15.5, -32.5),
        (62.4, 20, -35.5),
        (62.4, 15.5, -32.5),
        (68.2, 18.5, -31),
        (65.3, 20, -31),
        (62.4, 18.5, -31),
        (65.3, 17, -31),
        (65.3, 14, -34),
        (65.3, 10, -40),
    ]]
    fillet(fillet1_edges, radius=FILLET1_R)

    # Cut-Extrude15 outline → Cut-Extrude15 (cut)
    # profile 1 of 5: a face of its own
    with BuildSketch(Plane.ZY.offset(-62.4).offset(CUT_EXTRUDE15_START)):
        with Locations((-6, 15)):
            Circle(CUT_EXTRUDE15_OUTLINE_R)
        with Locations((-6, 15)):
            Circle(CUT_EXTRUDE15_OUTLINE_R_2, mode=Mode.SUBTRACT)
    # profile 2 of 5: a face of its own
    with BuildSketch(Plane.ZY.offset(-62.4).offset(CUT_EXTRUDE15_START)):
        with BuildLine():
            Line((-31, 14), (-28.791287847, 14))
            ThreePointArc((-28.791287847, 14), (-27.652142859, 12.781314165), (-26, 12.550510257))
            Line((-26, 12.550510257), (-26, 13.063508327))
            ThreePointArc((-26, 13.063508327), (-28.5, 15), (-26, 16.936491673))
            Line((-26, 16.936491673), (-26, 17.449489743))
            ThreePointArc((-26, 17.449489743), (-27.652142859, 17.218685835), (-28.791287847, 16))
            Line((-28.791287847, 16), (-31, 16))
            ThreePointArc((-31, 16), (-32, 15), (-31, 14))
        make_face()
    # profile 3 of 5: a face of its own
    with BuildSketch(Plane.ZY.offset(-62.4).offset(CUT_EXTRUDE15_START)):
        with BuildLine():
            Line((43.5, 15.502493781), (43.5, 14.497506219))
            ThreePointArc((43.5, 14.497506219), (48.55, 15), (43.5, 15.502493781))
        make_face()
        with Locations((46, 15)):
            Circle(CUT_EXTRUDE15_OUTLINE_R_2, mode=Mode.SUBTRACT)
    # profile 4 of 5: a face of its own
    with BuildSketch(Plane.ZY.offset(-62.4).offset(CUT_EXTRUDE15_START)):
        with Locations((8, 15)):
            Circle(CUT_EXTRUDE15_OUTLINE_R)
        with Locations((8, 15)):
            Circle(CUT_EXTRUDE15_OUTLINE_R_2, mode=Mode.SUBTRACT)
    # profile 5 of 5: a face of its own
    with BuildSketch(Plane.ZY.offset(-62.4).offset(CUT_EXTRUDE15_START)):
        with BuildLine():
            Line((20, 16.936491673), (20, 17.449489743))
            ThreePointArc((20, 17.449489743), (18, 15), (20, 12.550510257))
            Line((20, 12.550510257), (20, 13.063508327))
            ThreePointArc((20, 13.063508327), (18.5, 15), (20, 16.936491673))
        make_face()
    extrude(amount=CUT_EXTRUDE15_DEPTH, mode=Mode.SUBTRACT)


solid = body_2.part
